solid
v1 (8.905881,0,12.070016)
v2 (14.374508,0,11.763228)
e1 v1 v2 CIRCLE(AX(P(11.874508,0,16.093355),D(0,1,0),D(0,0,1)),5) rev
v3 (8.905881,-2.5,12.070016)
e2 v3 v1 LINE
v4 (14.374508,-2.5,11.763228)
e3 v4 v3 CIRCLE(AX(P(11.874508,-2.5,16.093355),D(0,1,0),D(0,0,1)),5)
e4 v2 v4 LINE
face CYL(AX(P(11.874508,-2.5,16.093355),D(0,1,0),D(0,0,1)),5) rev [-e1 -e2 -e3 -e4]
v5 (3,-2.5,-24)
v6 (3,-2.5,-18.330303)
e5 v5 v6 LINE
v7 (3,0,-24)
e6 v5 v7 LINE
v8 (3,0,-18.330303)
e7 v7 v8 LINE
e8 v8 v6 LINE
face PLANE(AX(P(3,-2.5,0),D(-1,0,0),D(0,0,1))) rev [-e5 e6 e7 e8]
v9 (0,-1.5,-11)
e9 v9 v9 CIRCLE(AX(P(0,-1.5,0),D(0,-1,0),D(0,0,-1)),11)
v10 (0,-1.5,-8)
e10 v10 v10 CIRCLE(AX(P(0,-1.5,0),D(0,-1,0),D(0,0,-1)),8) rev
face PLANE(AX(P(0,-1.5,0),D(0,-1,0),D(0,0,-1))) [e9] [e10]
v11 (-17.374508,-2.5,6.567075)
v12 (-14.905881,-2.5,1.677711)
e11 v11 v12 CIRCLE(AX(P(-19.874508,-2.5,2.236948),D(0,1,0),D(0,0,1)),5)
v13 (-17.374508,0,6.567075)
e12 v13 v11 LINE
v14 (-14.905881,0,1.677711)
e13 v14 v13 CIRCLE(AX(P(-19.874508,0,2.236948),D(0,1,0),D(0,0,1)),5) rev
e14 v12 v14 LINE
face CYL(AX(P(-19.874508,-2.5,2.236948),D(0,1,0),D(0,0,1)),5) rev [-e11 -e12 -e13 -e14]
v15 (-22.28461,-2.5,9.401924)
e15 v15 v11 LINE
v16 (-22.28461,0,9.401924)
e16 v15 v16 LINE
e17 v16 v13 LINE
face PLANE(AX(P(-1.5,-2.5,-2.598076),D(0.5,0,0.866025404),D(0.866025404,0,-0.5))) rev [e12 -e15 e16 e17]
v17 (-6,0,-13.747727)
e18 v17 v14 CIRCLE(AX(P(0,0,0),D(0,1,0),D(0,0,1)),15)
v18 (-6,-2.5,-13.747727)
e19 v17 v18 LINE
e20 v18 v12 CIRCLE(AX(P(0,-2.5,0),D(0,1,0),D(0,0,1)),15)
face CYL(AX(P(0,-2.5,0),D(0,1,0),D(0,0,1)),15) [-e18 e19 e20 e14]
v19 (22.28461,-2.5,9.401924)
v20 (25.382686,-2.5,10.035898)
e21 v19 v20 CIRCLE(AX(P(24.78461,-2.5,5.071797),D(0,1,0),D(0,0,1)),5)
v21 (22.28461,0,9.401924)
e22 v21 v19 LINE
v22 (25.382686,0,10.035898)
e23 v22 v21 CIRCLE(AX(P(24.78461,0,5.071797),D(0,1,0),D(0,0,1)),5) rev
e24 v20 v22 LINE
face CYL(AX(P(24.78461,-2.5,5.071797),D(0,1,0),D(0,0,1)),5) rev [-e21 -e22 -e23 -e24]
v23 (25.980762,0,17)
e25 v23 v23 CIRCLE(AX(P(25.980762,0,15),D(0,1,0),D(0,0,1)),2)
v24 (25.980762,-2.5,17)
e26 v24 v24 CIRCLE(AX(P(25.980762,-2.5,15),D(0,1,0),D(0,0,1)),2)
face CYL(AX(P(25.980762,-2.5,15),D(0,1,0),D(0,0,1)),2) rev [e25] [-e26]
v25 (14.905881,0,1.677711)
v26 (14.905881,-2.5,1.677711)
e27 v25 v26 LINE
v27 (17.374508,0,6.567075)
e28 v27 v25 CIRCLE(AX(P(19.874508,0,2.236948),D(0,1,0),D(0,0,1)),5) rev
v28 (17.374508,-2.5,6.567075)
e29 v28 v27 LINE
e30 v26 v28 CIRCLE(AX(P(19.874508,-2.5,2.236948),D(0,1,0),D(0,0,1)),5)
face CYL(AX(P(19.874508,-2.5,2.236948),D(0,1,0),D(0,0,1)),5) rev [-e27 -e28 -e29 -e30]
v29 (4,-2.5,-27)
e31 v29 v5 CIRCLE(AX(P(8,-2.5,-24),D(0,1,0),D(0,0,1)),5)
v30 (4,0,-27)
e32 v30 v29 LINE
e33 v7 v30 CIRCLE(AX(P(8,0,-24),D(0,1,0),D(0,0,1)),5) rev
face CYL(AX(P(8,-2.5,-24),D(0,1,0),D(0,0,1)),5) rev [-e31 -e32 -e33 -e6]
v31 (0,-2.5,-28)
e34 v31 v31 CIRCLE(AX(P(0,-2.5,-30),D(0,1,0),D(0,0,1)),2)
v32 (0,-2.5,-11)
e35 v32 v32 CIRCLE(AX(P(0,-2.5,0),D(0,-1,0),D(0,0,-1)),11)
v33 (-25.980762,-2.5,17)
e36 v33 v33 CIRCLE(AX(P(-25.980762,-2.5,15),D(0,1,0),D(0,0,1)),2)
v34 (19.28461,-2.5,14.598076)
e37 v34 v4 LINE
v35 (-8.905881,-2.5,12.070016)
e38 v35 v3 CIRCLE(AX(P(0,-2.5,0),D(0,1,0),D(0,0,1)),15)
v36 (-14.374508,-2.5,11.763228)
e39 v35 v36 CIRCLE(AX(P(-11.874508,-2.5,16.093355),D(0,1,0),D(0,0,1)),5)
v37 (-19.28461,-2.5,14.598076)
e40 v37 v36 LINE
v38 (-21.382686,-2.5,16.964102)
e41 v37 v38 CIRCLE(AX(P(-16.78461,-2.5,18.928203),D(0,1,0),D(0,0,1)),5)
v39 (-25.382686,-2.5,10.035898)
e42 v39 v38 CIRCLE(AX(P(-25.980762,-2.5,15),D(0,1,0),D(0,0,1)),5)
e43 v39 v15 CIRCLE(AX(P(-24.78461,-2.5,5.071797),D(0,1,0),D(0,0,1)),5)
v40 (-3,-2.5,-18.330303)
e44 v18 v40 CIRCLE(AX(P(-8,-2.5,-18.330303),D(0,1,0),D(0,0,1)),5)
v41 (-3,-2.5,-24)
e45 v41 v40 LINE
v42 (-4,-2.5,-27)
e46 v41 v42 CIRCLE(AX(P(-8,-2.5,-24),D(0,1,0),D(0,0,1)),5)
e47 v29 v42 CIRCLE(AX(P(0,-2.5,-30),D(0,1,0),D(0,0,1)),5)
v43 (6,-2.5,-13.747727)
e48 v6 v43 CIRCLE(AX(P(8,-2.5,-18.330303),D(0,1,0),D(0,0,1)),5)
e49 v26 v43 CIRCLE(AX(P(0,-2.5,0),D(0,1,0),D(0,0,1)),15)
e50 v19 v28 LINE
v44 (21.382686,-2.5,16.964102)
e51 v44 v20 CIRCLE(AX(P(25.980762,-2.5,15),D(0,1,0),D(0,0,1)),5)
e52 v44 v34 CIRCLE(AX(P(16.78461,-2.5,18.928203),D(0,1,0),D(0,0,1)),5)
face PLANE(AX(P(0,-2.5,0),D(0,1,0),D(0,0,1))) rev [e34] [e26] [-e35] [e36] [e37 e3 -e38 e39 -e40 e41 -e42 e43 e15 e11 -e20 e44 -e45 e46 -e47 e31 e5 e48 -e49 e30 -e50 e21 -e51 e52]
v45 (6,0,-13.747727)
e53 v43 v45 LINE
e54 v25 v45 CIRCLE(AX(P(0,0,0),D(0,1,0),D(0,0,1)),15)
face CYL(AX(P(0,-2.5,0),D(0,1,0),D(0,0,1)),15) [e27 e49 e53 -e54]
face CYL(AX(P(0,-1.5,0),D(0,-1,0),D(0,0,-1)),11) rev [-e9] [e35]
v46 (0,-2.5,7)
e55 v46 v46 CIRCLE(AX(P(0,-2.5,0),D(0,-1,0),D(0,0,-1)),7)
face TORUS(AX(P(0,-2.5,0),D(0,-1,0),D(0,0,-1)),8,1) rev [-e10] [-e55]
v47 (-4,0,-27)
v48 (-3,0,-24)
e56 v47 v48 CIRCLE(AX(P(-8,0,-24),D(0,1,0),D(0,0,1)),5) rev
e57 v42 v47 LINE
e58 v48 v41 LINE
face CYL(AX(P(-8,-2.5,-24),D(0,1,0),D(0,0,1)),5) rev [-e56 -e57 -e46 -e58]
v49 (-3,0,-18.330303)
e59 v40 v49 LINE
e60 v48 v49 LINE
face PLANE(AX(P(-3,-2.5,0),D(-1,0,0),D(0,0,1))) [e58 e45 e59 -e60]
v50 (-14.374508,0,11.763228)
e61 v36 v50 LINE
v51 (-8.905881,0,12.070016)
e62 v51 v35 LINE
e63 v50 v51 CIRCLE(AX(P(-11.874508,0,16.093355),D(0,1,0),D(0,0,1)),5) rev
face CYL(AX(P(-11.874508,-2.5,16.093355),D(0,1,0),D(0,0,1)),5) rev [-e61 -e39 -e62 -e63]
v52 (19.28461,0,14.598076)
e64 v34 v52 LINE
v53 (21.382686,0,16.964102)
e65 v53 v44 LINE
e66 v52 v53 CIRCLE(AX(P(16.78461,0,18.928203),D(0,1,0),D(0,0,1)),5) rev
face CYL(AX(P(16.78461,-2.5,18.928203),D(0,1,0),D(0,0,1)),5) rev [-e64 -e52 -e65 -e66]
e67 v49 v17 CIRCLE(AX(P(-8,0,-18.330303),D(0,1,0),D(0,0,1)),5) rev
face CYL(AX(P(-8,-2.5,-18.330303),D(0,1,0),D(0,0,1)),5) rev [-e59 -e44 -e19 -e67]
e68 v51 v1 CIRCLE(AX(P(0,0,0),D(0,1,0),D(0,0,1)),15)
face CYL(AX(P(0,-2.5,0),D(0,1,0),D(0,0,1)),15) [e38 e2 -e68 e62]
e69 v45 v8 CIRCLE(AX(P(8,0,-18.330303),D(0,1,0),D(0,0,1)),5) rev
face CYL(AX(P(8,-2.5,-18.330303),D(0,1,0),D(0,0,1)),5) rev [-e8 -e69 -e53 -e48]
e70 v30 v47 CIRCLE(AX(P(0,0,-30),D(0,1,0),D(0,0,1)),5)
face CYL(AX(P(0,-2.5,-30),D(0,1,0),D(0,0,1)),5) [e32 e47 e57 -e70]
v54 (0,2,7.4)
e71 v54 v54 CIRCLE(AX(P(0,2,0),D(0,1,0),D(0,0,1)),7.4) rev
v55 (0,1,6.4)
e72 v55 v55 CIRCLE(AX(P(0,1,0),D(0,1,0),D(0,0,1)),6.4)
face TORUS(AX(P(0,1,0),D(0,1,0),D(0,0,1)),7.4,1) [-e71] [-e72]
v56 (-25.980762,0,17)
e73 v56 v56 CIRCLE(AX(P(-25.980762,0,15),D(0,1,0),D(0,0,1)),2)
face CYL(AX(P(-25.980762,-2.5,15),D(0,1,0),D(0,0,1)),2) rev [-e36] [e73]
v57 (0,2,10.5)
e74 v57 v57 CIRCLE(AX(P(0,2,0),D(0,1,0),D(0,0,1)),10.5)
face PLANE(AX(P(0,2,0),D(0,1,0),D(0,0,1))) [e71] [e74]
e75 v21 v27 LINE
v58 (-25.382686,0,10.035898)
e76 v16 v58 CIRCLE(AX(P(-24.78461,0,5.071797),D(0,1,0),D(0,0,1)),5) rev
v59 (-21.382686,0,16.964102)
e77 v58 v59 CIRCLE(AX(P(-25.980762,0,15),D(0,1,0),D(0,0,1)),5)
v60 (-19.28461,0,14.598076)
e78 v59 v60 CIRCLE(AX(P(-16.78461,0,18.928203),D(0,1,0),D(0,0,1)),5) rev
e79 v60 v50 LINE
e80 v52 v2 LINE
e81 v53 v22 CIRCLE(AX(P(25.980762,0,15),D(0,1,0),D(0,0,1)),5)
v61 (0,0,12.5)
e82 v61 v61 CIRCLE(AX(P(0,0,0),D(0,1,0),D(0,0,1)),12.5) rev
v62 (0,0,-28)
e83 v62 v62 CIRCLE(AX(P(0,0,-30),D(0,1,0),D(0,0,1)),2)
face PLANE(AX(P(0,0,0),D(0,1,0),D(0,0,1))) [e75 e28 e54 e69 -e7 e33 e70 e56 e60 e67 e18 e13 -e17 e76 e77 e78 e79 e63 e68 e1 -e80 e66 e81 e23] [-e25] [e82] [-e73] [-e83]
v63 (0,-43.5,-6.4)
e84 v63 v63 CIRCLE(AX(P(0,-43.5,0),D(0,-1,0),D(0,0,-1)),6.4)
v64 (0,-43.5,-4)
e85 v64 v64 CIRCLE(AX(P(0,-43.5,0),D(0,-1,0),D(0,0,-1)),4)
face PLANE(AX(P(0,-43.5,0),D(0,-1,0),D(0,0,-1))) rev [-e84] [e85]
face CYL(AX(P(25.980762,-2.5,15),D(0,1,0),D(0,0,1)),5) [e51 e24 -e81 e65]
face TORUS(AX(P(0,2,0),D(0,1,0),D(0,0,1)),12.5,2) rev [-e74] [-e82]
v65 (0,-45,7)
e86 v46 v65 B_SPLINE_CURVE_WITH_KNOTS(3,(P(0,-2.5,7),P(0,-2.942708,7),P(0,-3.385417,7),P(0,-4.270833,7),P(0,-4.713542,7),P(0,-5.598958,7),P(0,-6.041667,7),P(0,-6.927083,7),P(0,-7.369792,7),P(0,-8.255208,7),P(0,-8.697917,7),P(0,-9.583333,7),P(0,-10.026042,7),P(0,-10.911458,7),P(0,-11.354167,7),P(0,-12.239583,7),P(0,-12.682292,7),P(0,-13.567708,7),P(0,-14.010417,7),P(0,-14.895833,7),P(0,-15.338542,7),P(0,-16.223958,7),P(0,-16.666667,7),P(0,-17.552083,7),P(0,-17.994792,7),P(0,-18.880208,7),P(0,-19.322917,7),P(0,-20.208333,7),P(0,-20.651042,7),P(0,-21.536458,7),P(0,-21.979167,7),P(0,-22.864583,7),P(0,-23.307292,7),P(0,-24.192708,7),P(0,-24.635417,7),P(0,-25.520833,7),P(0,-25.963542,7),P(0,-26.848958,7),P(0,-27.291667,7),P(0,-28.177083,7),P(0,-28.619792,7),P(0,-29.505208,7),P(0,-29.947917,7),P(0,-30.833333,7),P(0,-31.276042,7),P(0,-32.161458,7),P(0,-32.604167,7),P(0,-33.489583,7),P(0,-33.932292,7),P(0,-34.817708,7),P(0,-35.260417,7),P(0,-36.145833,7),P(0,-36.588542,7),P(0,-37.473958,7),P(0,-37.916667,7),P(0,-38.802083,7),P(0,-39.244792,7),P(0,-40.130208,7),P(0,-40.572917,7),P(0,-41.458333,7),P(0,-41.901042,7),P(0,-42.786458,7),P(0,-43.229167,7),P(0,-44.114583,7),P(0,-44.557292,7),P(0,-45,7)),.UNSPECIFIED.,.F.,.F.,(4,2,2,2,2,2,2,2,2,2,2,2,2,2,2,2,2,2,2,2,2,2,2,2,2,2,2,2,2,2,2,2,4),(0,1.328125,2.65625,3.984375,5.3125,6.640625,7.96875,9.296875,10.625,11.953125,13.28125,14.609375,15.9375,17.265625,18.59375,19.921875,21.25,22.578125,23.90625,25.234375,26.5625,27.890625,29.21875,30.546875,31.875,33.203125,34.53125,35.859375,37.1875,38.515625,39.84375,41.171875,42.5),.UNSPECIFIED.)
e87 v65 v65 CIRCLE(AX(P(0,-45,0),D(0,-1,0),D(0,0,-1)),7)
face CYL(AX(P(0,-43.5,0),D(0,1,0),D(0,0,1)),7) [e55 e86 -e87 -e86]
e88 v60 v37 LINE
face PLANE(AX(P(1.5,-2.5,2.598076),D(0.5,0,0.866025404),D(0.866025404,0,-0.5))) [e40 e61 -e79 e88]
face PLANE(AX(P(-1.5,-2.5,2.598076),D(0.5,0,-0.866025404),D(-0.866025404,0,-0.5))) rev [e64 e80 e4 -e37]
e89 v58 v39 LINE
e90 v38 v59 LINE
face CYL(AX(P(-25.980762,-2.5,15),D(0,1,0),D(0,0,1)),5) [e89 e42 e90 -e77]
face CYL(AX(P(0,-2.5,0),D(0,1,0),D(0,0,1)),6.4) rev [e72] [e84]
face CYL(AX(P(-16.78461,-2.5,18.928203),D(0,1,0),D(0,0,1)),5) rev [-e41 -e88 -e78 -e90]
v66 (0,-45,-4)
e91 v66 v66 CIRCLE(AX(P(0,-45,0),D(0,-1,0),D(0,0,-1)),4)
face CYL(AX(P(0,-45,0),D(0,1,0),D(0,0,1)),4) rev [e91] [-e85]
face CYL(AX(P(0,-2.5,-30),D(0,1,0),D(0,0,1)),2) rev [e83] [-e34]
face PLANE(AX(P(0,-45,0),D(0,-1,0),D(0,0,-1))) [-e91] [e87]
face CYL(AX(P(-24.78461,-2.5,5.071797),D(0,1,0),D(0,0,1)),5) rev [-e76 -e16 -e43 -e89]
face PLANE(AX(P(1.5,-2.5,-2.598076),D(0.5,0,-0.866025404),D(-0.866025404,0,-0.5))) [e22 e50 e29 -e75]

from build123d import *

# Parameters (mm, degrees)
SKETCH_1_R          = 2
SKETCH_1_R_2        = 6.4
EXTRUDE_1_DEPTH     = 2.5
EXTRUDE_START       = 2
SKETCH_2_R          = 10.5
SKETCH_2_R_2        = 6.4
EXTRUDE_2_DEPTH     = 2
SKETCH_3_R          = 11
CUT_EXTRUDE_1_DEPTH = 1
SKETCH_4_R          = 7
SKETCH_4_R_2        = 6.4
EXTRUDE_3_DEPTH     = 42
FILLET_2_R          = 1
SKETCH_5_R          = 7
SKETCH_5_R_2        = 4
EXTRUDE_4_DEPTH     = 1.5
FILLET_3_R          = 5
FILLET_4_R          = 2


with BuildPart() as part:
    # 草图1 → 凸台-拉伸1 (new body)
    with BuildSketch(Plane(origin=(0, 0, 0), x_dir=(1, 0, 0), z_dir=(0, 1, 0))):
        with BuildLine():
            ThreePointArc((3, 26), (0, 35), (-3, 26))
            Line((-3, 26), (-3, 14.696938457))
            ThreePointArc((-3, 14.696938457), (-12.990381057, 7.5), (-14.227922061, -4.750393017))
            Line((-14.227922061, -4.750393017), (-24.016660498, -10.401923789))
            ThreePointArc((-24.016660498, -10.401923789), (-30.310889132, -17.5), (-21.016660498, -15.598076211))
            Line((-21.016660498, -15.598076211), (-11.227922061, -9.94654544))
            ThreePointArc((-11.227922061, -9.94654544), (0, -15), (11.227922061, -9.94654544))
            Line((11.227922061, -9.94654544), (21.016660498, -15.598076211))
            ThreePointArc((21.016660498, -15.598076211), (30.310889132, -17.5), (24.016660498, -10.401923789))
            Line((24.016660498, -10.401923789), (14.227922061, -4.750393017))
            ThreePointArc((14.227922061, -4.750393017), (12.990381057, 7.5), (3, 14.696938457))
            Line((3, 14.696938457), (3, 26))
        make_face()
        with Locations(Location((-25.980762114, -15, 0), (0, 0, 270))):
            Circle(SKETCH_1_R, mode=Mode.SUBTRACT)
        with Locations(Location((0, 0, 0), (0, 0, 270))):
            Circle(SKETCH_1_R_2, mode=Mode.SUBTRACT)
        with Locations(Location((0, 30, 0), (0, 0, 270))):
            Circle(SKETCH_1_R, mode=Mode.SUBTRACT)
        with Locations(Location((25.980762114, -15, 0), (0, 0, 270))):
            Circle(SKETCH_1_R, mode=Mode.SUBTRACT)
    extrude(amount=-EXTRUDE_1_DEPTH)

    # 草图2 → 凸台-拉伸2 (add)
    with BuildSketch(Plane(origin=(0, 0, 0), x_dir=(1, 0, 0), z_dir=(0, 1, 0)).offset(EXTRUDE_START)):
        with Locations(Location((0, 0, 0), (0, 0, 270))):
            Circle(SKETCH_2_R)
        with Locations(Location((0, 0, 0), (0, 0, 270))):
            Circle(SKETCH_2_R_2, mode=Mode.SUBTRACT)
    extrude(amount=-EXTRUDE_2_DEPTH)

    # 草图3 → 切除-拉伸1 (cut)
    with BuildSketch(Plane.XZ.offset(2.5)):
        with Locations(Location((0, 0, 0), (0, 0, 270))):
            Circle(SKETCH_3_R)
    extrude(amount=-CUT_EXTRUDE_1_DEPTH, mode=Mode.SUBTRACT)

    # 草图4 → 凸台-拉伸3 (add)
    with BuildSketch(Plane.XZ.offset(1.5)):
        with Locations(Location((0, 0, 0), (0, 0, 90))):
            Circle(SKETCH_4_R)
        with Locations(Location((0, 0, 0), (0, 0, 90))):
            Circle(SKETCH_4_R_2, mode=Mode.SUBTRACT)
    extrude(amount=EXTRUDE_3_DEPTH)

    # 圆角2
    fillet_2_edges = [part.edges().sort_by_distance(p)[0] for p in [
        (0, 2, -6.4),
        (0, -1.5, -7),
    ]]
    fillet(fillet_2_edges, radius=FILLET_2_R)

    # 草图5 → 凸台-拉伸4 (add)
    with BuildSketch(Plane.XZ.offset(43.5)):
        with Locations(Location((0, 0, 0), (0, 0, 90))):
            Circle(SKETCH_5_R)
        with Locations(Location((0, 0, 0), (0, 0, 270))):
            Circle(SKETCH_5_R_2, mode=Mode.SUBTRACT)
    extrude(amount=EXTRUDE_4_DEPTH)

    # 圆角3
    fillet_3_edges = [part.edges().sort_by_distance(p)[0] for p in [
        (-24.016660498, -1.25, 10.401923789),
        (-14.227922061, -1.25, 4.750393017),
        (-3, -1.25, -14.696938457),
        (-3, -1.25, -26),
        (3, -1.25, -26),
        (3, -1.25, -14.696938457),
        (14.227922061, -1.25, 4.750393017),
        (24.016660498, -1.25, 10.401923789),
        (21.016660498, -1.25, 15.598076211),
        (11.227922061, -1.25, 9.94654544),
        (-11.227922061, -1.25, 9.94654544),
        (-21.016660498, -1.25, 15.598076211),
    ]]
    fillet(fillet_3_edges, radius=FILLET_3_R)

    # 圆角4
    fillet_4_edges = [part.edges().sort_by_distance(p)[0] for p in [
        (0, 0, -10.5),
    ]]
    fillet(fillet_4_edges, radius=FILLET_4_R - 0.0001)  # a hair under: the kernel refuses the full size


solid = part.part
